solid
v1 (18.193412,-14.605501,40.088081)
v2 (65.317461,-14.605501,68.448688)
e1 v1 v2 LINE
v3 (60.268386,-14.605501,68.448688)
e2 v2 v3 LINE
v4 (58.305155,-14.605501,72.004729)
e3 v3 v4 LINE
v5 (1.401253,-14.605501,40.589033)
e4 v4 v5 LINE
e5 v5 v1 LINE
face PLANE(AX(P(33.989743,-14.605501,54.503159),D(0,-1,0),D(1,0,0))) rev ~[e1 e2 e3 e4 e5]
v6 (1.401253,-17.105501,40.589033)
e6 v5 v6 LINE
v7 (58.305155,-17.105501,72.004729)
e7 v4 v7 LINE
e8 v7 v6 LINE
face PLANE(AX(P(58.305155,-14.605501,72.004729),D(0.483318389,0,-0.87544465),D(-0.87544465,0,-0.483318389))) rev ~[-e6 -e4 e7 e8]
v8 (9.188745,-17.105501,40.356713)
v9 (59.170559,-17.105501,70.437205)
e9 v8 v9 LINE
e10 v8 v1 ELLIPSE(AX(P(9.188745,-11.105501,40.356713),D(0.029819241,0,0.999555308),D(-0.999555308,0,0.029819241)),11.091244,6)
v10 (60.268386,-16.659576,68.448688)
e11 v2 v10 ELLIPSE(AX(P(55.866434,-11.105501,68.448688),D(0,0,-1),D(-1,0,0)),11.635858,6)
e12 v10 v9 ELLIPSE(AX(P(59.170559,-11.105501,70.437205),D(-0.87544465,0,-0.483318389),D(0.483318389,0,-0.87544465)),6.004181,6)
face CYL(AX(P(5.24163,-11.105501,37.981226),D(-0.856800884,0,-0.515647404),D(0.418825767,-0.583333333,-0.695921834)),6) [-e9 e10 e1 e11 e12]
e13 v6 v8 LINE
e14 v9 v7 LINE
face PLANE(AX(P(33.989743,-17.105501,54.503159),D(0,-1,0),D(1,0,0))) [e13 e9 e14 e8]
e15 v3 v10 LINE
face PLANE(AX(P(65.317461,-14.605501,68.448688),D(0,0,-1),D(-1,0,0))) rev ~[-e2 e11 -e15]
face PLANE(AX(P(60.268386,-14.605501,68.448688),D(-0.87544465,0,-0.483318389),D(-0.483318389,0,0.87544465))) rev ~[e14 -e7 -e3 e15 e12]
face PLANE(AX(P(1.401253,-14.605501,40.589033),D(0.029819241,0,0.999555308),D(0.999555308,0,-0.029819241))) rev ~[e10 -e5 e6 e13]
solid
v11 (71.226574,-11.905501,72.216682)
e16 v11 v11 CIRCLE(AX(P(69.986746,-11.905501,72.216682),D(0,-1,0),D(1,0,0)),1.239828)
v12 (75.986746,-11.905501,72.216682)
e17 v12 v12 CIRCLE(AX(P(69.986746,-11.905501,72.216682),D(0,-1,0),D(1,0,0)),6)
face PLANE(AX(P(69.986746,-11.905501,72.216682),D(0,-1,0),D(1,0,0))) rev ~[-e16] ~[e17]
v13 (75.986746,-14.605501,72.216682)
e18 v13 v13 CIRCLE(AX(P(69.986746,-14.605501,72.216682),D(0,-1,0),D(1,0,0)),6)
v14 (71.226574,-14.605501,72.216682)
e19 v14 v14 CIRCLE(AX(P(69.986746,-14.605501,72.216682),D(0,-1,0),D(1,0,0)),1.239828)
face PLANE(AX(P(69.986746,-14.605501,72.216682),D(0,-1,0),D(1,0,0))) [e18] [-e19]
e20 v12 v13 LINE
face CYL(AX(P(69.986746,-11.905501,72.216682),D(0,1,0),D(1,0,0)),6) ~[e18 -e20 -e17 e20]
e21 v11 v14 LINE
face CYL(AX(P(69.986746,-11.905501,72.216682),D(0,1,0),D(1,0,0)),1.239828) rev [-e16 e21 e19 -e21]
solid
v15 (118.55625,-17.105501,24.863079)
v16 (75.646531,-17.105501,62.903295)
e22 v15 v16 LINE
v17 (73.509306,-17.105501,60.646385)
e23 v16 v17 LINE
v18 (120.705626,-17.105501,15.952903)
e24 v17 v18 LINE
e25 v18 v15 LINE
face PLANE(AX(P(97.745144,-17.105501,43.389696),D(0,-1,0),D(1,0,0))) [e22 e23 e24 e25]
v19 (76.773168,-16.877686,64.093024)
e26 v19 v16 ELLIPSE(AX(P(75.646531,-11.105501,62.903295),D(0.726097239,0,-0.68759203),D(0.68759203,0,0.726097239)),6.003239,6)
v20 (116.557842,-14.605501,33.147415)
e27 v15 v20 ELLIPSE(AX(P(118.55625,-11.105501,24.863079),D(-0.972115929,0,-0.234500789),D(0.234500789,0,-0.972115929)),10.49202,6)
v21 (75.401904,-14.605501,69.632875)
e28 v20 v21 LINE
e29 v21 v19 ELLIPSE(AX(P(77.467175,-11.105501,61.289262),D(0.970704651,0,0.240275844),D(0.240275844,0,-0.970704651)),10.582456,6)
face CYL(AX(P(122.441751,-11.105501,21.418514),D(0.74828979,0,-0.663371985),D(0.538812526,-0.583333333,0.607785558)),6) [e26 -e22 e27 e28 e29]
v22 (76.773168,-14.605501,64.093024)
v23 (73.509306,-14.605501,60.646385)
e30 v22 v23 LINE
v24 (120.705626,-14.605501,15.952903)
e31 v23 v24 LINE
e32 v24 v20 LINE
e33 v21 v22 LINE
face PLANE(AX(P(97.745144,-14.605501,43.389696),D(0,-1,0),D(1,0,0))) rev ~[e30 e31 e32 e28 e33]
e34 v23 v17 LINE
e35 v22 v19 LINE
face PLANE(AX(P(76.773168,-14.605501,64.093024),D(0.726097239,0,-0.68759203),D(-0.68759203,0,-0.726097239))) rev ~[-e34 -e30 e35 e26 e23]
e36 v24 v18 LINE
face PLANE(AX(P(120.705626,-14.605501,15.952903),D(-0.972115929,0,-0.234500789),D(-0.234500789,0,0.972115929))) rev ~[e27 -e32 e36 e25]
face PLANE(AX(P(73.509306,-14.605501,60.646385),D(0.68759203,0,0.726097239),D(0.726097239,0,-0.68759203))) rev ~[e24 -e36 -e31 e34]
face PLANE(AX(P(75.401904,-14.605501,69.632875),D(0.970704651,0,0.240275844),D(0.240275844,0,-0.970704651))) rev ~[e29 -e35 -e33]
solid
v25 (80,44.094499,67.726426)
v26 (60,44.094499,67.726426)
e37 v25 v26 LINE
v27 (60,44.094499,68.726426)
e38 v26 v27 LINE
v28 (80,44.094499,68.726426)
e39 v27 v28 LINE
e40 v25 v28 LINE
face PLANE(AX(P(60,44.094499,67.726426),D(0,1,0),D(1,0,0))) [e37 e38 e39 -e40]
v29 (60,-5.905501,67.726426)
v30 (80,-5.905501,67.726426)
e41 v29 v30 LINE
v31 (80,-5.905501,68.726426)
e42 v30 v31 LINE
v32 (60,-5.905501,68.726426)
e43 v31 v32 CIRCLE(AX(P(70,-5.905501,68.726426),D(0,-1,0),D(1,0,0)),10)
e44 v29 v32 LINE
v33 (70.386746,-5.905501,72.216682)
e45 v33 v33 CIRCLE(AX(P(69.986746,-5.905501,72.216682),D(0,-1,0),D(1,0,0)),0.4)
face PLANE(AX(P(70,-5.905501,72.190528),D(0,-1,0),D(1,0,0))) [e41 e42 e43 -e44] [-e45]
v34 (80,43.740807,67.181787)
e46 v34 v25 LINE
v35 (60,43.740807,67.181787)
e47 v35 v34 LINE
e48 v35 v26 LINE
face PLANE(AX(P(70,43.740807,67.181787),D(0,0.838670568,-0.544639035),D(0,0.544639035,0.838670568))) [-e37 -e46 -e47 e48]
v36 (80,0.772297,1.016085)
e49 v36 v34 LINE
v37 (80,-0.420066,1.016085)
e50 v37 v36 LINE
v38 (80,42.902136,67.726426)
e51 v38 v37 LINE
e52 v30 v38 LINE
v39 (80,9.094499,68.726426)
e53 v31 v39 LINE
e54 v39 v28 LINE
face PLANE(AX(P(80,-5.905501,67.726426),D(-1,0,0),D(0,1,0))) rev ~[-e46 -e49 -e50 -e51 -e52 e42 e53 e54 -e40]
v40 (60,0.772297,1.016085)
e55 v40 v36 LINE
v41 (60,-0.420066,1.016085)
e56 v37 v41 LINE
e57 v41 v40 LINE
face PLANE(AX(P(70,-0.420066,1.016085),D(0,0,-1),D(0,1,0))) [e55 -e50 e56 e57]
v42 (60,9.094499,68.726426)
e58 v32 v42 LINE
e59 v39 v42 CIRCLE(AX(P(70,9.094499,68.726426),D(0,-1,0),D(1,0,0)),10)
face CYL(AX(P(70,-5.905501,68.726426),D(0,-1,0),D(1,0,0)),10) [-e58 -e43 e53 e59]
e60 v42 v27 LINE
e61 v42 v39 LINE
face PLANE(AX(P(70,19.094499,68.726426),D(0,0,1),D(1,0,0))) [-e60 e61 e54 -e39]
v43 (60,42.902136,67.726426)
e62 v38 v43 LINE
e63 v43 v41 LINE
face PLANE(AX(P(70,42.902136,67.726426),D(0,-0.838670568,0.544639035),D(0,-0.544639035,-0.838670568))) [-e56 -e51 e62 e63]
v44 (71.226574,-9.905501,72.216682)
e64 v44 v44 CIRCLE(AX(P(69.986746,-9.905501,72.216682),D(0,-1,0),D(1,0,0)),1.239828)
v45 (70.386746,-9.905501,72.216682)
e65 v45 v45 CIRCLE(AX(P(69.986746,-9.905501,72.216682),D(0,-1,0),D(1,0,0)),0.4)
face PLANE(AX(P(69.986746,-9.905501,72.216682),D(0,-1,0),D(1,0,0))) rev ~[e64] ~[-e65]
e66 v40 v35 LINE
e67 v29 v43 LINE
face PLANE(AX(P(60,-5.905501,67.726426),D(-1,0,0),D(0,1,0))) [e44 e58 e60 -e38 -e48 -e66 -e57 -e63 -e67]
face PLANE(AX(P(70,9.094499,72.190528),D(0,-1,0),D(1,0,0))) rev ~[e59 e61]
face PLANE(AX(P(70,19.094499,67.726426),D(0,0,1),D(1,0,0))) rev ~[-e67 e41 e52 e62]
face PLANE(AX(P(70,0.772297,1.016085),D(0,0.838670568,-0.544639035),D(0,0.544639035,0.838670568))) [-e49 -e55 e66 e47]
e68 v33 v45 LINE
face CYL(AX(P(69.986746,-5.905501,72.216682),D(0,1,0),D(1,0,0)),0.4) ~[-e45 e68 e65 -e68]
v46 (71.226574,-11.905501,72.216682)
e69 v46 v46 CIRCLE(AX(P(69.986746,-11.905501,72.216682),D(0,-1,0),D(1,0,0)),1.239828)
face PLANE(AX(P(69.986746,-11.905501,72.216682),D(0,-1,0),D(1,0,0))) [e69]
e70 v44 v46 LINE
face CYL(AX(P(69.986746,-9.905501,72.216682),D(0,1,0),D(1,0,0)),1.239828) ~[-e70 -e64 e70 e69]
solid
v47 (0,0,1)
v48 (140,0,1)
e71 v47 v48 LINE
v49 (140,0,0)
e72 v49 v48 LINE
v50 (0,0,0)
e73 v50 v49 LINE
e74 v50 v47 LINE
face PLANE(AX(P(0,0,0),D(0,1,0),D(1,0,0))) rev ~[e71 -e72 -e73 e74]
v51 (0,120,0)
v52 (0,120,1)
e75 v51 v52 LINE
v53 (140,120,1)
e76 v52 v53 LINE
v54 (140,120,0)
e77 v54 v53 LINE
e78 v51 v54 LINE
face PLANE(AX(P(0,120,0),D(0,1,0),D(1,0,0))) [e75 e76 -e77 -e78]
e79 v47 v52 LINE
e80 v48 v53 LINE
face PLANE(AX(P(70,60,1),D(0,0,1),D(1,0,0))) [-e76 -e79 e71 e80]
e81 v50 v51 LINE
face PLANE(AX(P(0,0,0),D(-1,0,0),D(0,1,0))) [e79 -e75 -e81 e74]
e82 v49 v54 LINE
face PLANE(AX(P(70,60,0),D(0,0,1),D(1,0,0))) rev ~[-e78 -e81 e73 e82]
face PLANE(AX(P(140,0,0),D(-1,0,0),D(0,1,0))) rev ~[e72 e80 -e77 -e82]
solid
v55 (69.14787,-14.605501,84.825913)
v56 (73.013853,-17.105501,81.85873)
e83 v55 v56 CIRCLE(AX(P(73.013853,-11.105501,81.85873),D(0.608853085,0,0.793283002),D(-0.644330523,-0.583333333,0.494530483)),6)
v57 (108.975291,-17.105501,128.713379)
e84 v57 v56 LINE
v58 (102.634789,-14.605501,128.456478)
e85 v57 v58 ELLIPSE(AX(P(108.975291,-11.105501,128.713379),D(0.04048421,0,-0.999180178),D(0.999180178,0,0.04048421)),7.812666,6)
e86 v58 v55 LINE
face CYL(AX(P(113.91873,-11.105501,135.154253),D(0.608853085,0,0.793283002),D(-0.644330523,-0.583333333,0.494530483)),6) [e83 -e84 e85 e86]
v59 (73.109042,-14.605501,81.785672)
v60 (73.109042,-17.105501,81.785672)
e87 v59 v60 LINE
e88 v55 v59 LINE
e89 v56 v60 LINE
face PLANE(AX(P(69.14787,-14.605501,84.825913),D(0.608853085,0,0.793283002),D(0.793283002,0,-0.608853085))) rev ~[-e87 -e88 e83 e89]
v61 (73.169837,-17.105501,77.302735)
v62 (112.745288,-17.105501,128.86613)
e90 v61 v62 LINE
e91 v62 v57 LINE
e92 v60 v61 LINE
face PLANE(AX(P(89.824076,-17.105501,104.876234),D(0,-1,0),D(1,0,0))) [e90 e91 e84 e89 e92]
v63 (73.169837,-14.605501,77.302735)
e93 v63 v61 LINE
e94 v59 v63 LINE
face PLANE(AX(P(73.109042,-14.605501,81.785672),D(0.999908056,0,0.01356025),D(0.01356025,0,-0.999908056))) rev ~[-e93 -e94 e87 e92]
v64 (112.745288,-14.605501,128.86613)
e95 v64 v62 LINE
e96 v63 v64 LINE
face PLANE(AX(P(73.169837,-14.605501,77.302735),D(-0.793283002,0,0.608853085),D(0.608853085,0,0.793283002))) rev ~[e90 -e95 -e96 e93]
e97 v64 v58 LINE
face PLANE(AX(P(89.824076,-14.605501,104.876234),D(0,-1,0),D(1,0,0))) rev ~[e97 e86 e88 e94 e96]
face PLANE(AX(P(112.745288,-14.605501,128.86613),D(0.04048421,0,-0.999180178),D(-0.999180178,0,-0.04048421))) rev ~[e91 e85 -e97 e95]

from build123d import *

# Parameters (mm, degrees)
F0_W           = 140
F0_H           = 120
F1_DEPTH       = 1
F4_DEPTH       = 10
F5_W           = 20
F5_H           = 50
F6_DEPTH       = 1
F8_DEPTH       = 15
F9_R           = 0.4
F10_DEPTH      = 4
F11_R          = 1.2398278846
F12_DEPTH      = 2
F13_R          = 6
F13_R_2        = 1.2398278846
F14_DEPTH      = 2.7
F16_DEPTH      = 2.5
F17_T1_DEPTH   = 79.366985862
F17_2_T1_DEPTH = 79.366985862
F17_3_T1_DEPTH = 79.366985862


# Not quite as in the source:
# - a fillet or chamfer that OpenCascade refuses, or shapes differently, is made with other operations: its cross-section is extruded or revolved along the edge and cut away or added


with BuildPart() as f1:
    # F0 (on Top) → F1 (new body)
    with BuildSketch(Plane.XY):
        with Locations((70, 60)):
            Rectangle(F0_W, F0_H)
    extrude(amount=F1_DEPTH)


with BuildPart() as f4:
    # F3 (on offset) → F4 (new body, symmetric)
    with BuildSketch(Plane.YZ.offset(70)):
        Polygon((-0.4200659473, 1.0160847374), (0.7722973455, 1.0160847374), (43.7408067697, 67.1817869472), (44.0944994946, 67.7264259822), (42.9021362018, 67.7264259822), align=None)
    extrude(amount=F4_DEPTH, both=True)

    # F5 (on face) → F6 (join)
    with BuildSketch(Plane.XY.offset(67.7264259822)):
        with Locations((70, 19.0944994946)):
            Rectangle(F5_W, F5_H)
    extrude(amount=F6_DEPTH)

    # F7 (on face) → F8 (join)
    with BuildSketch(Plane.XZ.offset(5.9055005054)):
        with BuildLine():
            Line((60, 68.7264259822), (80, 68.7264259822))
            ThreePointArc((80, 68.7264259822), (70, 78.7264259822), (60, 68.7264259822))
        make_face()
    extrude(amount=-F8_DEPTH)

    # F9 (on face) → F10 (join)
    with BuildSketch(Plane.XZ.offset(5.9055005054)):
        with Locations((69.9867457151, 72.2166821361)):
            Circle(F9_R)
    extrude(amount=F10_DEPTH)

    # F11 (on face) → F12 (join)
    with BuildSketch(Plane.XZ.offset(9.9055005054)):
        with Locations((69.9867457151, 72.2166821361)):
            Circle(F11_R)
    extrude(amount=F12_DEPTH)


with BuildPart() as f14:
    # F13 (on face) → F14 (new body)
    with BuildSketch(Plane.XZ.offset(11.9055005054)):
        with Locations((69.9867457151, 72.2166821361)):
            Circle(F13_R)
        with Locations((69.9867457151, 72.2166821361)):
            Circle(F13_R_2, mode=Mode.SUBTRACT)
    extrude(amount=F14_DEPTH)


with BuildPart() as f16:
    # F15 (on face) → F16 (new body)
    with BuildSketch(Plane.XZ.offset(14.6055005054)):
        Polygon((116.5578424183, 33.1474154847), (75.4019039591, 69.6328746368), (76.7731679631, 64.0930237523), (73.5093057156, 60.6463849545), (120.7056262574, 15.9529030212), align=None)
    extrude(amount=F16_DEPTH)

    # F17: fillet of radius 6 on 1 edges, made by hand

    # F17_s2 → F17_t1 (cut)
    with BuildSketch(Plane(origin=(57.9277089102, 0, -51.3539269506), x_dir=(0, 1, 0), z_dir=(-0.7482897902, 0, 0.6633719846))):
        with BuildLine():
            ThreePointArc((-14.6055005054, -102.1250798215), (-16.4440396314, -99.9902954366), (-17.1055005054, -97.2516826491))
            Line((-17.1055005054, -97.2516826491), (-17.1055005054, -102.1250798215))
            Line((-17.1055005054, -102.1250798215), (-14.6055005054, -102.1250798215))
        make_face()
    extrude(amount=F17_T1_DEPTH, mode=Mode.SUBTRACT)


with BuildPart() as f16b:
    # F15 (on face) → F16, piece 2 (new body)
    with BuildSketch(Plane.XZ.offset(14.6055005054)):
        Polygon((73.1090417788, 81.7856717816), (73.1698371178, 77.3027345465), (112.7452876158, 128.8661296819), (102.6347893563, 128.4564783105), (69.1478697041, 84.825913196), align=None)
    extrude(amount=F16_DEPTH)

    # F17#2: fillet of radius 6 on 1 edges, made by hand

    # F17_2_s2 → F17_2_t1 (cut)
    with BuildSketch(Plane(origin=(107.5084414965, 0, 140.0742172108), x_dir=(0, 1, 0), z_dir=(-0.6088530846, 0, -0.7932830021))):
        with BuildLine():
            ThreePointArc((-14.6055005054, 3.2073107645), (-16.4440396314, 5.3420951494), (-17.1055005054, 8.0807079369))
            Line((-17.1055005054, 8.0807079369), (-17.1055005054, 3.2073107645))
            Line((-17.1055005054, 3.2073107645), (-14.6055005054, 3.2073107645))
        make_face()
    extrude(amount=F17_2_T1_DEPTH, mode=Mode.SUBTRACT)


with BuildPart() as f16c:
    # F15 (on face) → F16, piece 3 (new body)
    with BuildSketch(Plane.XZ.offset(14.6055005054)):
        Polygon((18.1934121118, 40.0880810557), (65.3174607263, 68.4486882808), (60.2683858732, 68.4486882808), (58.3051553434, 72.0047285657), (1.4012531219, 40.5890332532), align=None)
    extrude(amount=F16_DEPTH)

    # F17#3: fillet of radius 6 on 1 edges, made by hand

    # F17_3_s2 → F17_3_t1 (cut)
    with BuildSketch(Plane(origin=(20.6282983072, 0, 12.4147029641), x_dir=(0, 1, 0), z_dir=(0.8568008839, 0, 0.5156474041))):
        with BuildLine():
            ThreePointArc((-14.6055005054, 24.9661175553), (-16.4440396314, 27.1009019401), (-17.1055005054, 29.8395147277))
            Line((-17.1055005054, 29.8395147277), (-17.1055005054, 24.9661175553))
            Line((-17.1055005054, 24.9661175553), (-14.6055005054, 24.9661175553))
        make_face()
    extrude(amount=F17_3_T1_DEPTH, mode=Mode.SUBTRACT)


solid = Compound([f1.part, f4.part, f14.part, f16.part, f16b.part, f16c.part])
